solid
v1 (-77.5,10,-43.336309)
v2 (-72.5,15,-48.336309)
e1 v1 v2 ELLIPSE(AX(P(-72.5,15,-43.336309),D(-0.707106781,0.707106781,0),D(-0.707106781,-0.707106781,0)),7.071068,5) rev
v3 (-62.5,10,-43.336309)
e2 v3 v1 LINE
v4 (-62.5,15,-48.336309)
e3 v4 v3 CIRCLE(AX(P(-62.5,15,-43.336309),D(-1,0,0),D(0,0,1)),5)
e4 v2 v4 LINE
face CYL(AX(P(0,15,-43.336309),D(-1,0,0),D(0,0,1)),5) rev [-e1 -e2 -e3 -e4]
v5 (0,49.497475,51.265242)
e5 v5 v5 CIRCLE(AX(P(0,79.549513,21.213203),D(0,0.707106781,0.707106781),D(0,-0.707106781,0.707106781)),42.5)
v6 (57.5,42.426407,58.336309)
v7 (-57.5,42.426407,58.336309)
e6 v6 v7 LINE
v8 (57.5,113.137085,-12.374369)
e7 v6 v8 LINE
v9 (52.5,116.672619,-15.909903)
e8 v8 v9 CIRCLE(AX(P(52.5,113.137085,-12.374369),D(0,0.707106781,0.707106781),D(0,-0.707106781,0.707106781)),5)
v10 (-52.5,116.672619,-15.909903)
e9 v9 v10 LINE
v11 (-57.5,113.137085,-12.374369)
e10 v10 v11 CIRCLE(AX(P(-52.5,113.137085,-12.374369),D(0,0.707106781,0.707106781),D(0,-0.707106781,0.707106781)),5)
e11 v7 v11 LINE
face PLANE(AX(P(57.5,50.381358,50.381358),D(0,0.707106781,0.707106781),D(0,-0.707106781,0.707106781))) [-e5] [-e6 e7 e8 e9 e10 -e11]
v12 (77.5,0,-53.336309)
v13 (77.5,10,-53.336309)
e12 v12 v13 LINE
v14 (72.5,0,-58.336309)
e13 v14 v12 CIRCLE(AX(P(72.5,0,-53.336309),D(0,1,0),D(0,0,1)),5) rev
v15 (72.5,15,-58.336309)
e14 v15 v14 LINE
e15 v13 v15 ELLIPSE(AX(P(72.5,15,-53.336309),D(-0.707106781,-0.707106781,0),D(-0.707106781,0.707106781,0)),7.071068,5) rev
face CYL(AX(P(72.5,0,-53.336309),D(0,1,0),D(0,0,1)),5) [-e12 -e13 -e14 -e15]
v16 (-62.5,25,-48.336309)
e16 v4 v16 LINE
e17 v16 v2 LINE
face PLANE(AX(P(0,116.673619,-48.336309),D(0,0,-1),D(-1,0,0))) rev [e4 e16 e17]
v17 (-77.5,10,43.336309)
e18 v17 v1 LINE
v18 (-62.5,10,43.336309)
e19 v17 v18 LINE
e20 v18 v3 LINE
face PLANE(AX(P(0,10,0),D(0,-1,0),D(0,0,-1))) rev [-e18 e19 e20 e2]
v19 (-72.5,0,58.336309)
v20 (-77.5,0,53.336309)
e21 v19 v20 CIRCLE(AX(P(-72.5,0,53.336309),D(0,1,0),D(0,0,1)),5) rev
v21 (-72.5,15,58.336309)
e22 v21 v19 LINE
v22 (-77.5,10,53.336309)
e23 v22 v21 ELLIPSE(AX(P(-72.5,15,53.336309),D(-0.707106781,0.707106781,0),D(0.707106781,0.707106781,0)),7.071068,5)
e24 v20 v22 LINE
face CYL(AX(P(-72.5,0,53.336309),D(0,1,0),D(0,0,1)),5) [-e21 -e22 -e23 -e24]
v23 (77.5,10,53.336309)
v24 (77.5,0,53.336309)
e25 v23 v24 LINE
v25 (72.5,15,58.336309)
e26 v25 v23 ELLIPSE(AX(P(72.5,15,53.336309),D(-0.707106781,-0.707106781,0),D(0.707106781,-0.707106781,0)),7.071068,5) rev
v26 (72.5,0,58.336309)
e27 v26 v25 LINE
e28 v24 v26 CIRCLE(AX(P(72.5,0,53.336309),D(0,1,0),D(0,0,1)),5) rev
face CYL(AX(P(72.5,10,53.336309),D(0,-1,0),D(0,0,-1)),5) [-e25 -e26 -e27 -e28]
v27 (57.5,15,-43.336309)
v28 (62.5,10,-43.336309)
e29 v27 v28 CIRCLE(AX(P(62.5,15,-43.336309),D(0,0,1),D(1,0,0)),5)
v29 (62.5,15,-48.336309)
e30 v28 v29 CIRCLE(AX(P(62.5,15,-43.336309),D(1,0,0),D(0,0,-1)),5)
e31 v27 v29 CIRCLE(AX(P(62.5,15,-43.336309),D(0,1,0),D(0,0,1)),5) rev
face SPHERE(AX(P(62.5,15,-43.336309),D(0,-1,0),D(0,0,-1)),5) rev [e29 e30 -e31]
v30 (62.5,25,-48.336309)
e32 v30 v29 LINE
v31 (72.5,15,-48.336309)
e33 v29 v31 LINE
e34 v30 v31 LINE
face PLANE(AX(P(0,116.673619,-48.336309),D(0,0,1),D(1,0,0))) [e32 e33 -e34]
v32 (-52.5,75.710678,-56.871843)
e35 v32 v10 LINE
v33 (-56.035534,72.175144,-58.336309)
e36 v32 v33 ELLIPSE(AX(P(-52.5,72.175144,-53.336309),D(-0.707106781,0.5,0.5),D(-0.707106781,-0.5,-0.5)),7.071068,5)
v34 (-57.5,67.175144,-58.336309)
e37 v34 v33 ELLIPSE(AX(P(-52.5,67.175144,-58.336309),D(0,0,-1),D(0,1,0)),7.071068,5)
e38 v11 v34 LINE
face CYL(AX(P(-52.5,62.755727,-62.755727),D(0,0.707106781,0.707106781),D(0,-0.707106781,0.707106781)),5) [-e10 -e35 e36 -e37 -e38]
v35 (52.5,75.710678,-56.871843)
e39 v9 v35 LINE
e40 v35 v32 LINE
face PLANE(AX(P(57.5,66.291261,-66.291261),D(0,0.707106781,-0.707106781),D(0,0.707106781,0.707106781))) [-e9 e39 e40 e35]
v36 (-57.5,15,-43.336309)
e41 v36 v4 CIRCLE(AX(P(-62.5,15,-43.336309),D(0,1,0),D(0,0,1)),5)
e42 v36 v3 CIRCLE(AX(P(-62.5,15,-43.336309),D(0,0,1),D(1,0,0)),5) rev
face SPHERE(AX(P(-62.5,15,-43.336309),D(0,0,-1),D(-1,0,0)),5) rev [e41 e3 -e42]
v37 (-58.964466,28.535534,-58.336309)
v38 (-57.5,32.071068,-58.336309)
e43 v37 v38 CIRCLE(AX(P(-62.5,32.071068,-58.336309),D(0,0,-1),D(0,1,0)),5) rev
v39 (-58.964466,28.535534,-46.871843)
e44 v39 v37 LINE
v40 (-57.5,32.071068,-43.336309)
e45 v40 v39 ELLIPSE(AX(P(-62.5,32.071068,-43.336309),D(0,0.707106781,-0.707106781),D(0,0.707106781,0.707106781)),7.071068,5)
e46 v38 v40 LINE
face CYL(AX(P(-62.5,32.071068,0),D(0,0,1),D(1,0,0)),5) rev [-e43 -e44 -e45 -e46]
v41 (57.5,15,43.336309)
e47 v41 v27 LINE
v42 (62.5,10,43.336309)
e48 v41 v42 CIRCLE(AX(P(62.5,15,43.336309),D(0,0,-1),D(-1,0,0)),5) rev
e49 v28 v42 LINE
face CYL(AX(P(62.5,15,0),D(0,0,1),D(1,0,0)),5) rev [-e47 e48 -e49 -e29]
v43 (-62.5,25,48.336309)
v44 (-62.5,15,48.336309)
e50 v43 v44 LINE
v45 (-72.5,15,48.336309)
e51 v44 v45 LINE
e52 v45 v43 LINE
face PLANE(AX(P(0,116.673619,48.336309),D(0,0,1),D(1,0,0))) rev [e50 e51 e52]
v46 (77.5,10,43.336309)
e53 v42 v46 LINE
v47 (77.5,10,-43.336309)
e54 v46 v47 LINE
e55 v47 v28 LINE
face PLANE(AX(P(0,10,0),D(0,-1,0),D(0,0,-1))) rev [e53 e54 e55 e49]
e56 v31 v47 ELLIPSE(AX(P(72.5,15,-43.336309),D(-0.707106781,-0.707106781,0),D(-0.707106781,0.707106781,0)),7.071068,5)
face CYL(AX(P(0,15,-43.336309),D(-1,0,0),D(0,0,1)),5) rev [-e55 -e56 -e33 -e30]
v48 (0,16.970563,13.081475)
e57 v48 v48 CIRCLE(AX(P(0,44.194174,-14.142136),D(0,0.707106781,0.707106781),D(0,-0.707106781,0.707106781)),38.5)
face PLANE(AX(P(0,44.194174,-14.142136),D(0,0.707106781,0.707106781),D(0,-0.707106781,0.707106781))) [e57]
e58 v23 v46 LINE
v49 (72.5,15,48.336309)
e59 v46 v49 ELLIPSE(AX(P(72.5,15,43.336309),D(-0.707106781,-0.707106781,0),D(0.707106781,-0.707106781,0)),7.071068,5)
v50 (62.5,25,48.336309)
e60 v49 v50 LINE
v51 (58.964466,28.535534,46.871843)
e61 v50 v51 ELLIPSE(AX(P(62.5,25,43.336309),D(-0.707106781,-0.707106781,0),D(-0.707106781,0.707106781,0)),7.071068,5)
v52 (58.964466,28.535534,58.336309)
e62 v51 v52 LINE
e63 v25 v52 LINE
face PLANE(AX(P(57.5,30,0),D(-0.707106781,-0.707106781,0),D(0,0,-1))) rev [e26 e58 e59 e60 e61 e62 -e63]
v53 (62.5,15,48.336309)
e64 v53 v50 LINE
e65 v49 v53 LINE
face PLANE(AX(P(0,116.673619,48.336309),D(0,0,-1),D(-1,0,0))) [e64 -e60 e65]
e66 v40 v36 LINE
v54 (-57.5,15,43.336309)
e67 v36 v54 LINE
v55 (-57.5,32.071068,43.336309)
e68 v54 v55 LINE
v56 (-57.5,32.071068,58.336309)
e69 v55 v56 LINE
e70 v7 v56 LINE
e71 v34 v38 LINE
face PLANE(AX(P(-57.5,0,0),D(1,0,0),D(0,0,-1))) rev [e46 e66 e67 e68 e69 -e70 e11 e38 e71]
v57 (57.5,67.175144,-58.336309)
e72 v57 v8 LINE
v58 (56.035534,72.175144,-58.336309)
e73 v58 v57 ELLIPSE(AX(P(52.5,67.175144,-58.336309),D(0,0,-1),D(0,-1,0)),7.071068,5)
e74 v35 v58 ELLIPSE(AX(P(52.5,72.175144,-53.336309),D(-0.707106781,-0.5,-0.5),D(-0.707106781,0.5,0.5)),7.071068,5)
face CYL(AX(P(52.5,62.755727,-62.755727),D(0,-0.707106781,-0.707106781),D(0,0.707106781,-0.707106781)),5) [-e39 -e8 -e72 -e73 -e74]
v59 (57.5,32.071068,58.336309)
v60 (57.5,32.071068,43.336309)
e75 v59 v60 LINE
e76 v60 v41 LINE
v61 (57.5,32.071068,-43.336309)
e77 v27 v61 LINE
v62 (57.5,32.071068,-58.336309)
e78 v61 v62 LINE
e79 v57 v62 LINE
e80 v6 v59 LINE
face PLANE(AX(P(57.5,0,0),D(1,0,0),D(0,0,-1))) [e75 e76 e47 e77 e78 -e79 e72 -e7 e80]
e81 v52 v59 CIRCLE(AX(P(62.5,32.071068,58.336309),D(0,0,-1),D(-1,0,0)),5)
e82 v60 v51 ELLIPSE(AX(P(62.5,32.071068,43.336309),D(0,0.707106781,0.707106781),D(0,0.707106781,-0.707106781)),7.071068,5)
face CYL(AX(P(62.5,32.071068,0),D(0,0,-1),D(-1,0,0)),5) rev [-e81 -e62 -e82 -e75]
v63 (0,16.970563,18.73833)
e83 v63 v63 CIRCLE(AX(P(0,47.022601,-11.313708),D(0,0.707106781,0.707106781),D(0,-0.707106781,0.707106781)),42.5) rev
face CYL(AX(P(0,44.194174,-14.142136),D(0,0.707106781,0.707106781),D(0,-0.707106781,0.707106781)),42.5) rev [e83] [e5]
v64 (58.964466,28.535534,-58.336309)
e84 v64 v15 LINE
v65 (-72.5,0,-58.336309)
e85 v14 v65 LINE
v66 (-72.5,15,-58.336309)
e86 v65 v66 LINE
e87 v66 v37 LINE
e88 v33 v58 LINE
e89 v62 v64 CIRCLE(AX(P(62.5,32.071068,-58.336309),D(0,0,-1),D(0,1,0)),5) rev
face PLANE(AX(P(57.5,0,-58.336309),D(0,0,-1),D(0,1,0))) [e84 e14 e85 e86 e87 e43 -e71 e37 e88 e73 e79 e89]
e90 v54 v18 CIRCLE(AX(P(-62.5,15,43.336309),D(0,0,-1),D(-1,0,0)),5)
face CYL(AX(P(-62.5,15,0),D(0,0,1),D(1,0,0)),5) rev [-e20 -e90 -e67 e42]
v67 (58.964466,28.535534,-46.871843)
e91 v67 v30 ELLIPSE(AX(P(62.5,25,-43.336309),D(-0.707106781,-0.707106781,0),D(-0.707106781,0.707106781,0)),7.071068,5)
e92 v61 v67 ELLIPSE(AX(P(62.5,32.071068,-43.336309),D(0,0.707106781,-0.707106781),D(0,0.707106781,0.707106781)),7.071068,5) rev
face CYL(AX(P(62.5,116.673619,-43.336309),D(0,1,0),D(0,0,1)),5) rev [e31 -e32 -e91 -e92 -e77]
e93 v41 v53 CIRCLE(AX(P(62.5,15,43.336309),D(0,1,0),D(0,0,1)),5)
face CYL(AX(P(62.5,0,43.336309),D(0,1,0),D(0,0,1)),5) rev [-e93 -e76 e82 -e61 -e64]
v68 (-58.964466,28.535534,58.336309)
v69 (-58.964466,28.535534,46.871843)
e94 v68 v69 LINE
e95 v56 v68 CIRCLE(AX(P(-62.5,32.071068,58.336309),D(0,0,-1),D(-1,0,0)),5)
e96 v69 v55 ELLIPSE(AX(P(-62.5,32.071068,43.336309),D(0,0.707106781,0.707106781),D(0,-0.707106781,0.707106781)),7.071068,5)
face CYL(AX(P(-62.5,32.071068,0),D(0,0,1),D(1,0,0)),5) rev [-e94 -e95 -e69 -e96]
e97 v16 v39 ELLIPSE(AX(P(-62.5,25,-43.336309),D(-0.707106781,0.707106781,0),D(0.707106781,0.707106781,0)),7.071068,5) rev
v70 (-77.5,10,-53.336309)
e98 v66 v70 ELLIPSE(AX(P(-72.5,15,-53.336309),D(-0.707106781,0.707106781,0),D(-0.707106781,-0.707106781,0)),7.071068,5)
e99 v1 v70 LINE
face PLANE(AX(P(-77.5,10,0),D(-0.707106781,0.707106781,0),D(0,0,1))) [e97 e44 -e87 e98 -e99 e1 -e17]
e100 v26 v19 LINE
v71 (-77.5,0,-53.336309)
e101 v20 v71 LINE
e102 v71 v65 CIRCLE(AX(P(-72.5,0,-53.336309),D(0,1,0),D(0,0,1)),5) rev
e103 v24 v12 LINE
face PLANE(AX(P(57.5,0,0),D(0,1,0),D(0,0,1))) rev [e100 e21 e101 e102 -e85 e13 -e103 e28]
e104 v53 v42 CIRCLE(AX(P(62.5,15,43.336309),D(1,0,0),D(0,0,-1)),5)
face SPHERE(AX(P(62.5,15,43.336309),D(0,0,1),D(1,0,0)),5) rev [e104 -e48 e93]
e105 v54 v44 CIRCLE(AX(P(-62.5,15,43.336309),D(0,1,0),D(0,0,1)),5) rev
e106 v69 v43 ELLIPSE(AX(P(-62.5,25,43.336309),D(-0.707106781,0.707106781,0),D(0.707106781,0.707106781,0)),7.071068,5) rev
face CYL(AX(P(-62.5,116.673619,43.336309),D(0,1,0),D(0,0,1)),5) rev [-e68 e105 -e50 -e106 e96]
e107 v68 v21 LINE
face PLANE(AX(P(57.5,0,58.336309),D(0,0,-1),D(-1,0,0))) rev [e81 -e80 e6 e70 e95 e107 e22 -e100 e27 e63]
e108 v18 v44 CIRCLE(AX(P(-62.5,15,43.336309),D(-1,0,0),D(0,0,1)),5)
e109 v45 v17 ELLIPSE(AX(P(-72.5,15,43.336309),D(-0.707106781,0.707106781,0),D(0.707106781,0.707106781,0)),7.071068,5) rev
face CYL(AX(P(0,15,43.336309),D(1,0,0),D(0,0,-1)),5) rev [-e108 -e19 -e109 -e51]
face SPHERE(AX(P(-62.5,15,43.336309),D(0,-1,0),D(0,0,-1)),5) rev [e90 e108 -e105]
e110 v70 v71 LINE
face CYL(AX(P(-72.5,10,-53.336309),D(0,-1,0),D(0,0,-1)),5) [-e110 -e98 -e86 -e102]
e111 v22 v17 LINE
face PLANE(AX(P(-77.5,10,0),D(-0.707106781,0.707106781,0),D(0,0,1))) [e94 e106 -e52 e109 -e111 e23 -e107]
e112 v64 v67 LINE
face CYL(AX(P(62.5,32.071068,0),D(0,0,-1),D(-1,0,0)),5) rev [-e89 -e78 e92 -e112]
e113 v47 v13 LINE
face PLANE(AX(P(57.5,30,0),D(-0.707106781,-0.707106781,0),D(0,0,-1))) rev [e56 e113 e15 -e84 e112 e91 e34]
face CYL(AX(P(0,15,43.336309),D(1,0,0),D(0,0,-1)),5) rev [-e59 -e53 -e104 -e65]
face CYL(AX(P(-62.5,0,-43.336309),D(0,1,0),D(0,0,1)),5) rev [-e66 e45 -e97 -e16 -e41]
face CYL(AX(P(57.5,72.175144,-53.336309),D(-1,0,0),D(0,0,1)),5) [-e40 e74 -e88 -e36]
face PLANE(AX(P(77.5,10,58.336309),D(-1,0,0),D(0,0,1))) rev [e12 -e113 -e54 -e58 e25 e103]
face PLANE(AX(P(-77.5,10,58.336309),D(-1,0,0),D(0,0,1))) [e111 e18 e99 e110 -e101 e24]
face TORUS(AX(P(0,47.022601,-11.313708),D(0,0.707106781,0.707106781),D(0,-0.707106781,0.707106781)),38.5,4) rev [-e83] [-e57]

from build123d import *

# Parameters (mm, degrees)
BOSS_EXTRU_1_DEPTH      = 57.5
ESQUISSE3_R             = 42.5
ENL_V_MAT_EXTRU_1_DEPTH = 50
ESQUISSE4_W             = 155
ESQUISSE4_H             = 116.672618896
BOSS_EXTRU_2_DEPTH      = 10
CHANFREIN1_SIZE         = 20
ENL_V_MAT_EXTRU_2_REACH = 163.73
ENL_V_START             = -10
ESQUISSE4_3_W           = 20
ESQUISSE4_3_H           = 96.672618896
CONG_3_R                = 5
CONG_1_R                = 4
CONG_2_R                = 5


with BuildPart() as part:
    # Esquisse2 → Boss.-Extru.1 (new, symmetric)
    with BuildSketch(Plane(origin=(0, 0, 0), x_dir=(0, 0, -1), z_dir=(1, 0, 0))):
        Polygon((8.838834765, 109.601551084), (15.909902577, 116.672618896), (58.336309448, 74.246212025), (58.336309448, 0), (-58.336309448, 0), (-58.336309448, 42.426406871), (-51.265241636, 49.497474683), (-15.909902577, 14.142135624), (44.194173824, 74.246212025), align=None)
        Polygon((-51.265241636, 49.497474683), (8.838834765, 109.601551084), (44.194173824, 74.246212025), (-15.909902577, 14.142135624), align=None)
    extrude(amount=BOSS_EXTRU_1_DEPTH, both=True)

    # Esquisse3 → Enlèv. mat.-Extru.1 (cut)
    with BuildSketch(Plane(origin=(0, 50.38135816, 50.38135816), x_dir=(1, 0, 0), z_dir=(0, 0.7071067811865441, 0.7071067811865509))):
        with Locations(Location((0, 41.25, 0), (0, 0, 270))):
            Circle(ESQUISSE3_R)
    extrude(amount=-ENL_V_MAT_EXTRU_1_DEPTH, mode=Mode.SUBTRACT)

    # Esquisse4 → Boss.-Extru.2 (add)
    with BuildSketch(Plane.XZ):
        Rectangle(ESQUISSE4_W, ESQUISSE4_H)
    extrude(amount=-BOSS_EXTRU_2_DEPTH)

    # Chanfrein1
    chanfrein1_edges = [part.edges().sort_by_distance(p)[0] for p in [
        (57.5, 10, 0),
        (-57.5, 10, 0),
    ]]
    chamfer(chanfrein1_edges, length=CHANFREIN1_SIZE - 0.0001)  # a hair under: the kernel refuses the full size

    # Esquisse4<3> → Enlèv. mat.-Extru.2 (cut, up to next)
    with BuildSketch(Plane.XZ.offset(ENL_V_START), mode=Mode.PRIVATE) as enl_v_mat_extru_2_sk1:
        with Locations((-67.5, 0)):
            Rectangle(ESQUISSE4_3_W, ESQUISSE4_3_H)
    enl_v_mat_extru_2_tool1 = extrude(enl_v_mat_extru_2_sk1.sketch, amount=-ENL_V_MAT_EXTRU_2_REACH, mode=Mode.PRIVATE) & part.part
    # Esquisse4<3> → Enlèv. mat.-Extru.2 (cut, up to next)
    with BuildSketch(Plane.XZ.offset(ENL_V_START), mode=Mode.PRIVATE) as enl_v_mat_extru_2_sk2:
        with Locations((67.5, 0)):
            Rectangle(ESQUISSE4_3_W, ESQUISSE4_3_H)
    enl_v_mat_extru_2_tool2 = extrude(enl_v_mat_extru_2_sk2.sketch, amount=-ENL_V_MAT_EXTRU_2_REACH, mode=Mode.PRIVATE) & part.part
    add(enl_v_mat_extru_2_tool1.solids().sort_by_distance((-67.5, 10, 0))[0], mode=Mode.SUBTRACT)
    add(enl_v_mat_extru_2_tool2.solids().sort_by_distance((67.5, 10, 0))[0], mode=Mode.SUBTRACT)

    # Congé3
    cong_3_edges = [part.edges().sort_by_distance(p)[0] for p in [
        (57.5, 29.9999, 53.336309448),
        (-57.5, 29.9999, -53.336309448),
        (-57.5, 29.9999, 53.336309448),
        (57.5, 29.9999, -53.336309448),
        (-57.5, 19.99995, 48.336309448),
        (-57.5, 10, 0),
        (-57.5, 19.99995, -48.336309448),
        (-67.49995, 10, 48.336309448),
        (-67.49995, 10, -48.336309448),
        (67.49995, 10, -48.336309448),
        (57.5, 19.99995, -48.336309448),
        (57.5, 10, 0),
        (67.49995, 10, 48.336309448),
        (57.5, 19.99995, 48.336309448),
    ]]
    fillet(cong_3_edges, radius=CONG_3_R)

    # Congé1
    cong_1_edges = [part.edges().sort_by_distance(p)[0] for p in [
        (0, 74.246212025, -44.194173824),
    ]]
    fillet(cong_1_edges, radius=CONG_1_R)

    # Congé2
    cong_2_edges = [part.edges().sort_by_distance(p)[0] for p in [
        (0, 74.246212025, -58.336309448),
        (57.5, 95.45941546, -37.123106012),
        (-77.5, 5, 58.336309448),
        (-77.5, 5, -58.336309448),
        (77.5, 5, 58.336309448),
        (77.5, 5, -58.336309448),
        (-57.5, 95.45941546, -37.123106012),
    ]]
    fillet(cong_2_edges, radius=CONG_2_R)


solid = part.part
